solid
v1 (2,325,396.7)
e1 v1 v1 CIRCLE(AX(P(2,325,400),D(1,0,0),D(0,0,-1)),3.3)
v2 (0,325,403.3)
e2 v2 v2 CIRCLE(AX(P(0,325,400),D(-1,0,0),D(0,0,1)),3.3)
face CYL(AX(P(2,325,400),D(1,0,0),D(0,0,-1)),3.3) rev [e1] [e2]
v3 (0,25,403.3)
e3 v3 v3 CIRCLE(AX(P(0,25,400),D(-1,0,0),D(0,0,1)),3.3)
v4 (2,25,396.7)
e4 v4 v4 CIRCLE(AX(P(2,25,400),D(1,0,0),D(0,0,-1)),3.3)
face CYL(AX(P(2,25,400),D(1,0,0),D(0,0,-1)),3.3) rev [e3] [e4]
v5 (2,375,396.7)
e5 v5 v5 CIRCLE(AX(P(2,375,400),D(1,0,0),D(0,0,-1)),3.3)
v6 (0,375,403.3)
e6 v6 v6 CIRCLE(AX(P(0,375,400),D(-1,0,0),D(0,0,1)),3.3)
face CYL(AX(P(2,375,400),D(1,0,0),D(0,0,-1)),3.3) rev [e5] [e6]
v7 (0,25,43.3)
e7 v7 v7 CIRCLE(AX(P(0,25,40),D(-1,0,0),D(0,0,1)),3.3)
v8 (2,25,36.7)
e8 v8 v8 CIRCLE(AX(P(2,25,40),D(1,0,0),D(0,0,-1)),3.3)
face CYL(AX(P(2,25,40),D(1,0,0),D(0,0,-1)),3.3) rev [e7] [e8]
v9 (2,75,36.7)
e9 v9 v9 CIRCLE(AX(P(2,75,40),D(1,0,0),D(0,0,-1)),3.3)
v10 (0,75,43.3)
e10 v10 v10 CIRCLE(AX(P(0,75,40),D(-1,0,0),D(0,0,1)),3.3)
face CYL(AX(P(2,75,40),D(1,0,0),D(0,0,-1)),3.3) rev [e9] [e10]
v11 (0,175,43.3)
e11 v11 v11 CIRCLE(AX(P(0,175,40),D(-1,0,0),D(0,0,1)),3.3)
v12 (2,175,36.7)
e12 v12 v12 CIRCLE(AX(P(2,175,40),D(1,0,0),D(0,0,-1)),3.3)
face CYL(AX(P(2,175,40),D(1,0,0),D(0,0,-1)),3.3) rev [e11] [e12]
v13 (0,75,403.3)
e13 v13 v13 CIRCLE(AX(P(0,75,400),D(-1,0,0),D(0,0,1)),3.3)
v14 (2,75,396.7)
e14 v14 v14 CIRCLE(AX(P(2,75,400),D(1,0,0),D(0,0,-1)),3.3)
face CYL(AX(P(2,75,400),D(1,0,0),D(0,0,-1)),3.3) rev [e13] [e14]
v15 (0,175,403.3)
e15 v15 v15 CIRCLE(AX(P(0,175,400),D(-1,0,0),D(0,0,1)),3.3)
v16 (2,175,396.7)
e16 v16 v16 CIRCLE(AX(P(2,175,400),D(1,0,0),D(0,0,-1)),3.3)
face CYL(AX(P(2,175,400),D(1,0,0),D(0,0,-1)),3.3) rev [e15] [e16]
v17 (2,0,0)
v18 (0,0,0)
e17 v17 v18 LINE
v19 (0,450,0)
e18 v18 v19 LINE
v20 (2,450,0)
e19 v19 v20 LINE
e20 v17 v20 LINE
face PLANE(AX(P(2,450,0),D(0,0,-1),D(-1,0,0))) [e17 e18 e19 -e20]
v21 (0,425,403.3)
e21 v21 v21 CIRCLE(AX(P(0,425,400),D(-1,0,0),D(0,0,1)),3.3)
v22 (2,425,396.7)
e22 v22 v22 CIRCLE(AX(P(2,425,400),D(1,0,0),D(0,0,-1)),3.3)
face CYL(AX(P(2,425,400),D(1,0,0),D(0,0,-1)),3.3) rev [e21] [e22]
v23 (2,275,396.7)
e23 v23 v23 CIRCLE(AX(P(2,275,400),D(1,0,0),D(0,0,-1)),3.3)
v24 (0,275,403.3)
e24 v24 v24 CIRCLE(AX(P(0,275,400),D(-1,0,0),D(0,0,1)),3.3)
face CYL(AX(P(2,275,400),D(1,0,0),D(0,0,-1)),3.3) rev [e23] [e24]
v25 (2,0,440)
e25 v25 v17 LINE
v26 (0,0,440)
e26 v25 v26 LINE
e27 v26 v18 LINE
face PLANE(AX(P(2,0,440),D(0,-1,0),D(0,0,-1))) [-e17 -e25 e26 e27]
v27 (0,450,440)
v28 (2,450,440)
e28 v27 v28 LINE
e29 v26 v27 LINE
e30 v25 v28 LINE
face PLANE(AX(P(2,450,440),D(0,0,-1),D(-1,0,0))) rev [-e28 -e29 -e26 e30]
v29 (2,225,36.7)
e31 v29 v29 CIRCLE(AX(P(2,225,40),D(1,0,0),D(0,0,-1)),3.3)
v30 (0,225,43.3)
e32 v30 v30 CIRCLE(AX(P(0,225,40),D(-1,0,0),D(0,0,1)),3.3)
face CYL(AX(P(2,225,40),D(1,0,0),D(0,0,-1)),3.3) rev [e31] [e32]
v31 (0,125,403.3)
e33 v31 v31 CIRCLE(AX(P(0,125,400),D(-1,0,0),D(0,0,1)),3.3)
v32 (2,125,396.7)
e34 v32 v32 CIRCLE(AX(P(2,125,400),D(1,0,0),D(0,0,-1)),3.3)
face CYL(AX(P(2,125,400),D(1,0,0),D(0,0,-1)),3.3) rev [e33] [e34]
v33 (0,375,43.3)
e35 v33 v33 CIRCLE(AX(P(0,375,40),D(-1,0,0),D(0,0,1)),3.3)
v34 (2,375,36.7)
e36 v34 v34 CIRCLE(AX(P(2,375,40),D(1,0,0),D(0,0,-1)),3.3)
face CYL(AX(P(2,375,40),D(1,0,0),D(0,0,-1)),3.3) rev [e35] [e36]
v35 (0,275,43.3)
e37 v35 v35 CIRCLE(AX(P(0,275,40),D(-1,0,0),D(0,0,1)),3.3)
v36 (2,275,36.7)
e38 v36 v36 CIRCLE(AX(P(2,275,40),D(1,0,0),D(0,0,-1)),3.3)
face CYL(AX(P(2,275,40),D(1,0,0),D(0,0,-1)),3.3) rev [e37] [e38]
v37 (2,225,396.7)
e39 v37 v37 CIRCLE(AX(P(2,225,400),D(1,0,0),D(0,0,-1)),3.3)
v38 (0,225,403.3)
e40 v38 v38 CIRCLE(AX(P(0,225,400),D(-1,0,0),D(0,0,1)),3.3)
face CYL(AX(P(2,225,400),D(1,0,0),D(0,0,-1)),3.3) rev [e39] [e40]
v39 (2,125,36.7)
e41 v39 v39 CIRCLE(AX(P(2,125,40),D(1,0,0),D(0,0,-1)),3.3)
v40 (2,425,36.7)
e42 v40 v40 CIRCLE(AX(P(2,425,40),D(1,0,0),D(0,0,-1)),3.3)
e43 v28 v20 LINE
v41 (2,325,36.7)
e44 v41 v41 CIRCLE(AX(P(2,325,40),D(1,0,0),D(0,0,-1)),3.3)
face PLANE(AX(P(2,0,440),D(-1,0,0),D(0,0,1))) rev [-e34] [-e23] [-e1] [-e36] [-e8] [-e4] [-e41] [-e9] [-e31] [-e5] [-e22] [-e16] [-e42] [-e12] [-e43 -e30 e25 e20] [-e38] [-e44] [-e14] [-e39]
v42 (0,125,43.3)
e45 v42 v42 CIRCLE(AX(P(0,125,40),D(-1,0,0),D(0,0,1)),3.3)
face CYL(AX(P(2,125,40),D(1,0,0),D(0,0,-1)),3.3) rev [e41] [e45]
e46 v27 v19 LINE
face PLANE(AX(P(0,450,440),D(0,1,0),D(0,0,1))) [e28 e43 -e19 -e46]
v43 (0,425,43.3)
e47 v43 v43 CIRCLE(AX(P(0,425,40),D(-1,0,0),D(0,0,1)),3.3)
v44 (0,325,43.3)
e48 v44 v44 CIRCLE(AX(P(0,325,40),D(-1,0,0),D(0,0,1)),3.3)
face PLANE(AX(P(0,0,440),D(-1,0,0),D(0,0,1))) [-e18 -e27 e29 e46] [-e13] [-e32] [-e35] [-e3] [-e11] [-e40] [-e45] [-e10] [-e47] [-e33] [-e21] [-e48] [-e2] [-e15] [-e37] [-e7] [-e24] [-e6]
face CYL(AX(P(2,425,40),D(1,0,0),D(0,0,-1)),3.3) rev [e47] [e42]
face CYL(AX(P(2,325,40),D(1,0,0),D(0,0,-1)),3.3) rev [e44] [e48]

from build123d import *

# Parameters (mm, degrees)
SKETCH_1_W             = 2
SKETCH_1_H             = 450
SM_BASE_FLANGE_1_DEPTH = 440
HOLE_WIZARD_M61_D      = 6.6
HOLE_WIZARD_M61_DEPTH  = 5
HOLE_WIZARD_M61_TIP    = 1.982840043


# Sheet-metal steps are written as plain solids
with BuildPart() as part:
    # Sketch 1 → Базовая кромка1 (new body)
    with BuildSketch(Plane.XY):
        with Locations((1, 225)):
            Rectangle(SKETCH_1_W, SKETCH_1_H)
    extrude(amount=SM_BASE_FLANGE_1_DEPTH)

    # Отверстие с зазором M61
    with Locations(Plane(origin=(2, 0, 0), x_dir=(0, 0, -1), z_dir=(1, 0, 0))):
        with Locations((-400, 425), (-400, 375), (-400, 325), (-400, 275), (-400, 225), (-400, 175), (-400, 125), (-400, 75), (-400, 25), (-40, 25), (-40, 75), (-40, 125), (-40, 175), (-40, 225), (-40, 275), (-40, 325), (-40, 375), (-40, 425)):
            Hole(HOLE_WIZARD_M61_D / 2, depth=HOLE_WIZARD_M61_DEPTH)
            with Locations((0, 0, -(HOLE_WIZARD_M61_DEPTH + HOLE_WIZARD_M61_TIP / 2))):  # 118° drill point
                Cone(0, HOLE_WIZARD_M61_D / 2, HOLE_WIZARD_M61_TIP, mode=Mode.SUBTRACT)


solid = part.part
